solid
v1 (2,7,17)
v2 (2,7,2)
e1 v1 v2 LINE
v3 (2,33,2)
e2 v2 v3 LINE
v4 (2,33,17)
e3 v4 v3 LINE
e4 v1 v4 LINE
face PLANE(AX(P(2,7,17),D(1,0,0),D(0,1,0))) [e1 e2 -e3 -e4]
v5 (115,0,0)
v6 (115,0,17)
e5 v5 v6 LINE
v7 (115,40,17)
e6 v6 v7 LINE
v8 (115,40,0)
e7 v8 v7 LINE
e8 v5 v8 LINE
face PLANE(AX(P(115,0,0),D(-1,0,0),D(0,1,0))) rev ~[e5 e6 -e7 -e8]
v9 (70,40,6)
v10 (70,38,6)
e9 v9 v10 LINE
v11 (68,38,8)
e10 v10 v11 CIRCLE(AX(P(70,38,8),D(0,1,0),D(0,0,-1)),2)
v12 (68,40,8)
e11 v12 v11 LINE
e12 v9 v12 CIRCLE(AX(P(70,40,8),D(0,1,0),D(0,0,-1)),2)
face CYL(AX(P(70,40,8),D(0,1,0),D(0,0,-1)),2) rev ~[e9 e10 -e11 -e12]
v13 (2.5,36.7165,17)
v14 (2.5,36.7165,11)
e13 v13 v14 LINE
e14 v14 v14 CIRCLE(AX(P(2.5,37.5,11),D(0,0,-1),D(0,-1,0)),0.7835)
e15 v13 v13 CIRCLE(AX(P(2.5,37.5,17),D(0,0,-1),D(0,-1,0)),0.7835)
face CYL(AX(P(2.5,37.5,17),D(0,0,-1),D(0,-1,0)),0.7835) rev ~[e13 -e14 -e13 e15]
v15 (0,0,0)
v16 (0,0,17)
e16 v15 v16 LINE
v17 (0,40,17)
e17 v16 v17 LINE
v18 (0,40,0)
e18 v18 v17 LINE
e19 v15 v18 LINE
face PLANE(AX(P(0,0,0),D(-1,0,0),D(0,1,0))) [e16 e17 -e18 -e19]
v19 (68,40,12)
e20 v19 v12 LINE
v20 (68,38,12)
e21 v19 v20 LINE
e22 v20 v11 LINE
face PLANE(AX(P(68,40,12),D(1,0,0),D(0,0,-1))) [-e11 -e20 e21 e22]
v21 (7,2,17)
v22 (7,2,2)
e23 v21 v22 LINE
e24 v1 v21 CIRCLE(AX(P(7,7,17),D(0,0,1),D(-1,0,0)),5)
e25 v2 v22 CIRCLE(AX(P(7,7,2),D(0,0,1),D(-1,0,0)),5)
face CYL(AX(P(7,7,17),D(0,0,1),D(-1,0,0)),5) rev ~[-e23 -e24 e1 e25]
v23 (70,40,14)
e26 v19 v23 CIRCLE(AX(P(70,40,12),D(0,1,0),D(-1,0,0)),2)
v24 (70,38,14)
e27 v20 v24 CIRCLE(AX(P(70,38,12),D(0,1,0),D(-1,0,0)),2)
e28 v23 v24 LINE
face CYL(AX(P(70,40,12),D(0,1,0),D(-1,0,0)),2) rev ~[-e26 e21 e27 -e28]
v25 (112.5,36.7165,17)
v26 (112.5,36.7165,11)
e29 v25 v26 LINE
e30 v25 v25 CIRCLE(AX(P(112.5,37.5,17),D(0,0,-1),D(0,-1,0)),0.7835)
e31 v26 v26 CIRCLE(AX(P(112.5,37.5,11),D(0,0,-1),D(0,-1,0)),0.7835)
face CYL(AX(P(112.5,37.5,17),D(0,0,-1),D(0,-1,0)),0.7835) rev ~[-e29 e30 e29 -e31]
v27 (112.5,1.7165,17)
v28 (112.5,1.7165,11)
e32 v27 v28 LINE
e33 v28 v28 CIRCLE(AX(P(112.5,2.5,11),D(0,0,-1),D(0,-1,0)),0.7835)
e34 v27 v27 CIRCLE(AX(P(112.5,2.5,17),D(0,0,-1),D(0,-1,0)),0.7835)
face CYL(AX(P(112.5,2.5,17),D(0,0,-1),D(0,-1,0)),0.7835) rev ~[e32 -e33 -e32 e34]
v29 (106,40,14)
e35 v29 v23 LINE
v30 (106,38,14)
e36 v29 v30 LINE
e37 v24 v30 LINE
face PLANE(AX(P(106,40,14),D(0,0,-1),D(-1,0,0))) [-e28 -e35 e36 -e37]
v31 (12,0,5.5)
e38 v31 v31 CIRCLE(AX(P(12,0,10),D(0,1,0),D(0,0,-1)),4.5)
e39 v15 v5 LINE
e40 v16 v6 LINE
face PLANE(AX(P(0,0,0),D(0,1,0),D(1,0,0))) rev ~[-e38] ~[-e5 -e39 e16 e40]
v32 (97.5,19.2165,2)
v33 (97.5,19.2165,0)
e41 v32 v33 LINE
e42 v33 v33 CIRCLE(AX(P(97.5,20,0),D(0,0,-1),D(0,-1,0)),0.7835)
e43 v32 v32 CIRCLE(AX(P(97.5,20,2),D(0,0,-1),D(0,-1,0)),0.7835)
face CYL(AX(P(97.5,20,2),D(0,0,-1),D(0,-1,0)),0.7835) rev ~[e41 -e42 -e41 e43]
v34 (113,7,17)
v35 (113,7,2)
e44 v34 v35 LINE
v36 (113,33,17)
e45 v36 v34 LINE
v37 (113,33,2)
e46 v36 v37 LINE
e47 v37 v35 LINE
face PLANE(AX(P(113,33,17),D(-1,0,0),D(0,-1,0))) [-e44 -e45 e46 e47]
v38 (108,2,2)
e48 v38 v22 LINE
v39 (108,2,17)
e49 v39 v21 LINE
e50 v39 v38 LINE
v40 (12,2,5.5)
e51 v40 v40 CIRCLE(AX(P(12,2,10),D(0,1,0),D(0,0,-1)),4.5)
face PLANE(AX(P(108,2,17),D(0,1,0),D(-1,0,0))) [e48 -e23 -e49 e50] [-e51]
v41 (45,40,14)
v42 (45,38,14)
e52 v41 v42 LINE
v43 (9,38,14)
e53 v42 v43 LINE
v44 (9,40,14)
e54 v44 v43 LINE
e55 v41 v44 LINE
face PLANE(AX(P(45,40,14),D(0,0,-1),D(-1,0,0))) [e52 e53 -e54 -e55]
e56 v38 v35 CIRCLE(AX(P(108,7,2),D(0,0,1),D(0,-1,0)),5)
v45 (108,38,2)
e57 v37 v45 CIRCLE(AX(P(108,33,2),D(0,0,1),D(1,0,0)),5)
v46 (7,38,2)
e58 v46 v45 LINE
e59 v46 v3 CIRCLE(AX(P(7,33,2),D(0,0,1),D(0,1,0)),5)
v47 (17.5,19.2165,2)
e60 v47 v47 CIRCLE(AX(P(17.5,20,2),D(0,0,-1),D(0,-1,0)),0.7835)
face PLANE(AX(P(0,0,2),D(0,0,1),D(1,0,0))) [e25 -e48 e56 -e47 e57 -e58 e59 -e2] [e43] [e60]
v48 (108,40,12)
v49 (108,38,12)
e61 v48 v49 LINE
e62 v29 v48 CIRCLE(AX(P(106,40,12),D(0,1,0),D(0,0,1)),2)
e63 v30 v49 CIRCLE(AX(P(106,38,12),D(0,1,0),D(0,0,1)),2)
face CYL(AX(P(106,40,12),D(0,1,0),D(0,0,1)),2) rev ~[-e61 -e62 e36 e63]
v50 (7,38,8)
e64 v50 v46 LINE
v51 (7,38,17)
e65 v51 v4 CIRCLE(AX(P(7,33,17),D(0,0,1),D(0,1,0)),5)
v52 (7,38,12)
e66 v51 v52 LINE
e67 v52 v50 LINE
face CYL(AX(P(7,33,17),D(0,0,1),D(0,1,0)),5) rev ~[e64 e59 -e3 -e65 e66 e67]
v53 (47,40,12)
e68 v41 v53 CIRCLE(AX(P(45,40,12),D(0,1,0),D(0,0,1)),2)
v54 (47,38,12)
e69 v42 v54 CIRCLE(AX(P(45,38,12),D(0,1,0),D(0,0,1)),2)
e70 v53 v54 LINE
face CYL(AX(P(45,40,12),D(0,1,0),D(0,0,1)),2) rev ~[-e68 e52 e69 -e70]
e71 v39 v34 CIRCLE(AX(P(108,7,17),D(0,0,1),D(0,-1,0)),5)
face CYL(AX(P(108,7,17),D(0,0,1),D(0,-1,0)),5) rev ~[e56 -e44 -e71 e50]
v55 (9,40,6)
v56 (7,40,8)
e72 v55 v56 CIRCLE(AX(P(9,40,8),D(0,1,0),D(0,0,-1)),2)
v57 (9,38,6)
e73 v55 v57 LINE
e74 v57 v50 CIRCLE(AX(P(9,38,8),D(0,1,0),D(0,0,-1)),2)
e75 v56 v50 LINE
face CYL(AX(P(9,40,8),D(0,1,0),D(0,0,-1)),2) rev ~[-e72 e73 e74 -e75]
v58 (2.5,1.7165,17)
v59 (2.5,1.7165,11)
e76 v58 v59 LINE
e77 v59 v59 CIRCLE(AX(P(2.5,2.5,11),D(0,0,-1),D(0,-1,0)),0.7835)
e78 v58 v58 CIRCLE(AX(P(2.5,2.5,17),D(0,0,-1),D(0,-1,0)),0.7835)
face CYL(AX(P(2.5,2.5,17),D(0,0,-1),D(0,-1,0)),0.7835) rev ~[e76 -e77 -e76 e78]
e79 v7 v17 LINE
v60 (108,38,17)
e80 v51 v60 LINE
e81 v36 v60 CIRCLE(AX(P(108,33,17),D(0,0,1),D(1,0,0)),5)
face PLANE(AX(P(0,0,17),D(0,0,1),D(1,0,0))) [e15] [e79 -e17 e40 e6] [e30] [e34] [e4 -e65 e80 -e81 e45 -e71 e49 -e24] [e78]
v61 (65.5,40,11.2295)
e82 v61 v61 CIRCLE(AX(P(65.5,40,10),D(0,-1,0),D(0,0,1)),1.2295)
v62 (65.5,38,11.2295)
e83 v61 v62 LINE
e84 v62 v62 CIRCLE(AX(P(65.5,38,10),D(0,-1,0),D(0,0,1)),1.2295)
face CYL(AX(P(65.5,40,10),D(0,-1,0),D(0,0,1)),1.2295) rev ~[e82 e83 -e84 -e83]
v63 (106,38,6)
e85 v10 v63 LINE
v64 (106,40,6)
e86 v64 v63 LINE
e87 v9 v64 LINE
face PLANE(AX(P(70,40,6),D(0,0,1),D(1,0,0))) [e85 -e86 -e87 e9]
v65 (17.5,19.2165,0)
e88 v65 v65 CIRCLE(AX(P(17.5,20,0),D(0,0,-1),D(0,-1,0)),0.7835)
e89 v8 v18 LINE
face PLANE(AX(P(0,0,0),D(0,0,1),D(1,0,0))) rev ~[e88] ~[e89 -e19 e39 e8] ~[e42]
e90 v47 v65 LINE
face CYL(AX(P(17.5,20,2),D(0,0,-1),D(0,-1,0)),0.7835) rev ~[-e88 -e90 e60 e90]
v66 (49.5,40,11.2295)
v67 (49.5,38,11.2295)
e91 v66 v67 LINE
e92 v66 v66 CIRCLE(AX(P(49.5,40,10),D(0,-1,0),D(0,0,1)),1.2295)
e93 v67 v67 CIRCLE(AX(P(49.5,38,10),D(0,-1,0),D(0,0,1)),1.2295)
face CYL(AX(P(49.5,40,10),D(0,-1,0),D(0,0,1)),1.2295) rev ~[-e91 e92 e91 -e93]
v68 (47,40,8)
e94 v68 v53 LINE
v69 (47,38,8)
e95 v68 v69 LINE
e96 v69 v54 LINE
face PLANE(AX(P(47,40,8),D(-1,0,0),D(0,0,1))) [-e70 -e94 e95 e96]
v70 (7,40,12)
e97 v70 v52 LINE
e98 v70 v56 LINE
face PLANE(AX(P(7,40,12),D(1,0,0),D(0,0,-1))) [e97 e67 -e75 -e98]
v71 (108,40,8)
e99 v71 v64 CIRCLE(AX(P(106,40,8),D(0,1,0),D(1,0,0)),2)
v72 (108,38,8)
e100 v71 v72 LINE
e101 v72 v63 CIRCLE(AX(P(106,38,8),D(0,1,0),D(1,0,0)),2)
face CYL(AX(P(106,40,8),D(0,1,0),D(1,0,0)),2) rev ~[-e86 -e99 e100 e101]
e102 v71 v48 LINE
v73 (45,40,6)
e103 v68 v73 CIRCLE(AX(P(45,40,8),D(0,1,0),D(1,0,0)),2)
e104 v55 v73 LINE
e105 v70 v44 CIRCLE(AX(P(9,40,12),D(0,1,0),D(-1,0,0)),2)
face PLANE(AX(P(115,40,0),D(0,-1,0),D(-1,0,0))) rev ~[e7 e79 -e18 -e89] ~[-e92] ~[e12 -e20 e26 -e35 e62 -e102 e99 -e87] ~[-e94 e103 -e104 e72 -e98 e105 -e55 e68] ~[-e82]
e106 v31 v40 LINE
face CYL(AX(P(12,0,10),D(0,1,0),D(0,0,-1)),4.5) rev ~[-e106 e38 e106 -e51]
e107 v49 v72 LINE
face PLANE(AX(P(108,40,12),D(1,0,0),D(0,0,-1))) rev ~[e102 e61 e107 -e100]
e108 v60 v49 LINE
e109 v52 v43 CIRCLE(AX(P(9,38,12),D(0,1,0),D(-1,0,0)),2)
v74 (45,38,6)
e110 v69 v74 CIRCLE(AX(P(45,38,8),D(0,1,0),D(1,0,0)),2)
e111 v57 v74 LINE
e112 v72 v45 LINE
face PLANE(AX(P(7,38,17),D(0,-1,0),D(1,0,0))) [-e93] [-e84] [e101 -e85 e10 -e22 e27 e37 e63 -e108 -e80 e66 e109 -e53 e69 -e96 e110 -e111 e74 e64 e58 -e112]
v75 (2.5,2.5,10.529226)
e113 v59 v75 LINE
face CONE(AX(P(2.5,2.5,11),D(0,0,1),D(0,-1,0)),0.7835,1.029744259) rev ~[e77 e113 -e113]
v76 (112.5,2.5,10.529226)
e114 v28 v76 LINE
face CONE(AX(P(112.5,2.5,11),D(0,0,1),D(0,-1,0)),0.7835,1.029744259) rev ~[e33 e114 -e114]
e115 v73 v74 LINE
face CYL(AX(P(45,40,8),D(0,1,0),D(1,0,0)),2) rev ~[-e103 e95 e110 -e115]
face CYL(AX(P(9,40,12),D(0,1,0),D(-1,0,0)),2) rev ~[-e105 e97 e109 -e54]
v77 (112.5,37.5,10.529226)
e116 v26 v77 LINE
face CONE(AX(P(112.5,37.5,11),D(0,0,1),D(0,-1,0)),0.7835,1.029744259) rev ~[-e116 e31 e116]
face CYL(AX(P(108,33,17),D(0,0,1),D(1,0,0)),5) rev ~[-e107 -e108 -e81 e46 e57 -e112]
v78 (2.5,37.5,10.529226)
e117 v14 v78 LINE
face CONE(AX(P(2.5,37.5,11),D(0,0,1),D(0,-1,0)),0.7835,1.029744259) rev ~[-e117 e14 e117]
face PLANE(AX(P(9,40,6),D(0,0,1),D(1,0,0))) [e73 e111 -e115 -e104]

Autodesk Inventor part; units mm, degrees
ref_plane "YZ Plane" through (0, 0, 0) normal (1, 0, 0) x (0, 1, 0)
ref_plane "XZ Plane" through (0, 0, 0) normal (0, 1, 0) x (-1, 0, 0)
ref_plane "XY Plane" through (0, 0, 0) normal (0, 0, 1) x (1, 0, 0)
sketch "Skizze1" plane through (0, 0, 0) normal (0, 0, 1) x (1, 0, 0)
  line L0 (-23, 0) -> (138, 0) projected
  line L1 (0, -8) -> (0, 48) projected
  line L2 (0, 0) -> (115, 0)
  line L3 (115, 0) -> (115, 40)
  line L4 (115, 40) -> (0, 40)
  line L5 (0, 40) -> (0, 0)
  dimension "d0" = 40
  dimension "d1" = 115
extrude "Extrusion1" add sketch "Skizze1" along normal blind 17
sketch "Skizze2" plane through (0, 0, 17) normal (0, 0, 1) x (1, 0, 0)
  line L0 (0, 0) -> (115, 0) projected
  line L1 (115, 0) -> (115, 40) projected
  line L2 (115, 40) -> (0, 40) projected
  line L3 (0, 40) -> (0, 0) projected
  line L4 (7, 38) -> (108, 38)
  line L5 (113, 33) -> (113, 7)
  line L6 (108, 2) -> (7, 2)
  line L7 (2, 7) -> (2, 33)
  arc A0 (7, 38) -> (2, 33) centre (7, 33) ccw
  arc A1 (113, 33) -> (108, 38) centre (108, 33) ccw
  arc A2 (108, 2) -> (113, 7) centre (108, 7) ccw
  arc A3 (2, 7) -> (7, 2) centre (7, 7) ccw
  dimension "d4" = 2
  dimension "d5" = 5
extrude "Extrusion2" cut sketch "Skizze2" against normal blind 15 contours L4 A1 L5 A2 L6 A3 L7 A0
sketch "Skizze3" plane through (0, 0, 17) normal (0, 0, 1) x (1, 0, 0)
  line L0 (0, 0) -> (115, 0) projected
  line L1 (115, 0) -> (115, 40) projected
  line L2 (115, 40) -> (0, 40) projected
  line L3 (0, 40) -> (0, 0) projected
  line L4 (2.5, 37.5) -> (112.5, 37.5)
  line L5 (112.5, 37.5) -> (112.5, 2.5)
  line L6 (112.5, 2.5) -> (2.5, 2.5)
  line L7 (2.5, 2.5) -> (2.5, 37.5)
  dimension "d8" = 2.5
hole "Bohrung1" at (112.5, 37.5, 17) at (112.5, 2.5, 17) at (2.5, 2.5, 17) at (2.5, 37.5, 17) direction (0, 0, -1) diameter 1.567 depth 6 tip angle 118 thread size "M2x0.4" class "6H" standard "ISO Metric profile"
sketch "Skizze4" plane through (0, 40, 0) normal (0, 1, 0) x (1, 0, 0)
  line L0 (0, 0) -> (0, -17) projected
  line L1 (113, -17) -> (108, -17) projected
  line L2 (113, -17) -> (108, -17) projected
  line L3 (113, -17) -> (113, -2) projected
  line L4 (113, -2) -> (108, -2) projected
  line L5 (108, -17) -> (108, -2) projected
  line L6 (108, -17) -> (7, -17) projected
  line L7 (108, -17) -> (108, -2) projected
  line L8 (108, -2) -> (7, -2) projected
  line L9 (7, -17) -> (7, -2) projected
  line L10 (88, -11) -> (88, -16) projected
  line L11 (108, -11) -> (88, -11) projected
  line L12 (108, -16) -> (108, -11) projected
  line L13 (88, -16) -> (108, -16) projected
  line L14 (-60.4, 0) -> (362.4, 0) projected
  line L15 (0, 3.4) -> (0, -20.4) projected
  arc A0 (118, -8) -> (118, -12) centre (118, -10) ccw projected
  line L16 (302, -14) -> (294, -14) projected
  line L17 (302, -6) -> (302, -14) projected
  line L18 (294, -6) -> (302, -6) projected
  line L19 (106, -14) -> (70, -14)
  line L20 (68, -12) -> (68, -8)
  line L21 (70, -6) -> (106, -6)
  line L22 (108, -8) -> (108, -12)
  arc A1 (108, -8) -> (106, -6) centre (106, -8) ccw
  arc A2 (106, -14) -> (108, -12) centre (106, -12) ccw
  arc A3 (68, -12) -> (70, -14) centre (70, -12) ccw
  arc A4 (70, -6) -> (68, -8) centre (70, -8) ccw
  line L23 (45, -14) -> (9, -14)
  line L24 (7, -12) -> (7, -8)
  line L25 (9, -6) -> (45, -6)
  line L26 (47, -8) -> (47, -12)
  arc A5 (45, -14) -> (47, -12) centre (45, -12) ccw
  arc A6 (47, -8) -> (45, -6) centre (45, -8) ccw
  arc A7 (9, -6) -> (7, -8) centre (9, -8) ccw
  arc A8 (7, -12) -> (9, -14) centre (9, -12) ccw
  line L27 (115, 0) -> (115, -17) projected
  arc A9 (283, -8) -> (281, -6) centre (281, -8) ccw projected
  line L28 (283, -8) -> (283, -12) projected
  arc A10 (281, -14) -> (283, -12) centre (281, -12) ccw projected
  line L29 (294, -14) -> (281, -14) projected
  line L30 (281, -6) -> (294, -6) projected
  point P0 (6, -6)
  point P1 (6, -14)
  point P2 (108, -14)
  point P3 (68, -6)
  point P4 (68, -14)
  point P5 (47, -14)
  point P6 (7, -6)
  dimension "d16" = 40
  dimension "d17" = 2
  dimension "d18" = 7
  dimension "d19" = 40
  dimension "d20" = 2
  dimension "d23" = 7
extrude "Extrusion3" cut sketch "Skizze4" against normal blind 2 contours A2 L19 L10 L11 L5 | L9 A7 L25 A6 L26 A5 L23 A8 | L5 L11 L10 L19 A3 L20 A4 L21 A1
sketch "Skizze5" plane through (0, 40, 0) normal (0, 1, 0) x (1, 0, 0)
  line L0 (0, 0) -> (0, -17) projected
  line L1 (115, -17) -> (0, -17) projected
  line L2 (115, 0) -> (115, -17) projected
  line L3 (0, -10) -> (115, -10)
  line L4 (115, 0) -> (0, 0) projected
  line L5 (57.5, -10) -> (57.5, -13.4142)
  point P0 (49.5, -10)
  point P1 (65.5, -10)
  dimension "d24" = 7
  dimension "d35" = 16
hole "Bohrung2" at (49.5, 40, 10) at (65.5, 40, 10) direction (0, -1, 0) diameter 2.459 depth 8 tip angle 118 thread size "M3x0.5" class "6H" standard "ISO Metric profile"
sketch "Skizze6" plane through (0, 0, 2) normal (0, 0, 1) x (1, 0, 0)
  line L0 (7, 38) -> (108, 38) projected
  line L1 (2, 7) -> (2, 33) projected
  line L2 (113, 33) -> (113, 7) projected
  line L3 (-23, 0) -> (138, 0) projected
  line L4 (0, -8) -> (0, 48) projected
  line L5 (2, 20) -> (113, 20)
  line L6 (57.5, 38) -> (57.5, 39.5212)
  point P0 (0, 0)
  point P1 (17.5, 20)
  point P2 (97.5, 20)
  dimension "d36" = 80
hole "Bohrung3" at (17.5, 20, 2) at (97.5, 20, 2) direction (0, 0, -1) diameter 1.567 end through all thread size "M2x0.4" class "6H" standard "ISO Metric profile"
sketch "Skizze7" plane through (0, 0, 0) normal (0, -1, 0) x (1, 0, 0)
  line L0 (0, 0) -> (115, 0) projected
  line L1 (0, 0) -> (0, 17) projected
  line L2 (0, 10) -> (20.9799, 10)
  line L3 (7, 17) -> (7, 2) projected
  point P0 (12, 10)
  dimension "d44" = 10
  dimension "d45" = 12
hole "Bohrung4" at (12, 0, 10) direction (0, 1, 0) diameter 9 end up to surface
properties part number "13_1087_023"
